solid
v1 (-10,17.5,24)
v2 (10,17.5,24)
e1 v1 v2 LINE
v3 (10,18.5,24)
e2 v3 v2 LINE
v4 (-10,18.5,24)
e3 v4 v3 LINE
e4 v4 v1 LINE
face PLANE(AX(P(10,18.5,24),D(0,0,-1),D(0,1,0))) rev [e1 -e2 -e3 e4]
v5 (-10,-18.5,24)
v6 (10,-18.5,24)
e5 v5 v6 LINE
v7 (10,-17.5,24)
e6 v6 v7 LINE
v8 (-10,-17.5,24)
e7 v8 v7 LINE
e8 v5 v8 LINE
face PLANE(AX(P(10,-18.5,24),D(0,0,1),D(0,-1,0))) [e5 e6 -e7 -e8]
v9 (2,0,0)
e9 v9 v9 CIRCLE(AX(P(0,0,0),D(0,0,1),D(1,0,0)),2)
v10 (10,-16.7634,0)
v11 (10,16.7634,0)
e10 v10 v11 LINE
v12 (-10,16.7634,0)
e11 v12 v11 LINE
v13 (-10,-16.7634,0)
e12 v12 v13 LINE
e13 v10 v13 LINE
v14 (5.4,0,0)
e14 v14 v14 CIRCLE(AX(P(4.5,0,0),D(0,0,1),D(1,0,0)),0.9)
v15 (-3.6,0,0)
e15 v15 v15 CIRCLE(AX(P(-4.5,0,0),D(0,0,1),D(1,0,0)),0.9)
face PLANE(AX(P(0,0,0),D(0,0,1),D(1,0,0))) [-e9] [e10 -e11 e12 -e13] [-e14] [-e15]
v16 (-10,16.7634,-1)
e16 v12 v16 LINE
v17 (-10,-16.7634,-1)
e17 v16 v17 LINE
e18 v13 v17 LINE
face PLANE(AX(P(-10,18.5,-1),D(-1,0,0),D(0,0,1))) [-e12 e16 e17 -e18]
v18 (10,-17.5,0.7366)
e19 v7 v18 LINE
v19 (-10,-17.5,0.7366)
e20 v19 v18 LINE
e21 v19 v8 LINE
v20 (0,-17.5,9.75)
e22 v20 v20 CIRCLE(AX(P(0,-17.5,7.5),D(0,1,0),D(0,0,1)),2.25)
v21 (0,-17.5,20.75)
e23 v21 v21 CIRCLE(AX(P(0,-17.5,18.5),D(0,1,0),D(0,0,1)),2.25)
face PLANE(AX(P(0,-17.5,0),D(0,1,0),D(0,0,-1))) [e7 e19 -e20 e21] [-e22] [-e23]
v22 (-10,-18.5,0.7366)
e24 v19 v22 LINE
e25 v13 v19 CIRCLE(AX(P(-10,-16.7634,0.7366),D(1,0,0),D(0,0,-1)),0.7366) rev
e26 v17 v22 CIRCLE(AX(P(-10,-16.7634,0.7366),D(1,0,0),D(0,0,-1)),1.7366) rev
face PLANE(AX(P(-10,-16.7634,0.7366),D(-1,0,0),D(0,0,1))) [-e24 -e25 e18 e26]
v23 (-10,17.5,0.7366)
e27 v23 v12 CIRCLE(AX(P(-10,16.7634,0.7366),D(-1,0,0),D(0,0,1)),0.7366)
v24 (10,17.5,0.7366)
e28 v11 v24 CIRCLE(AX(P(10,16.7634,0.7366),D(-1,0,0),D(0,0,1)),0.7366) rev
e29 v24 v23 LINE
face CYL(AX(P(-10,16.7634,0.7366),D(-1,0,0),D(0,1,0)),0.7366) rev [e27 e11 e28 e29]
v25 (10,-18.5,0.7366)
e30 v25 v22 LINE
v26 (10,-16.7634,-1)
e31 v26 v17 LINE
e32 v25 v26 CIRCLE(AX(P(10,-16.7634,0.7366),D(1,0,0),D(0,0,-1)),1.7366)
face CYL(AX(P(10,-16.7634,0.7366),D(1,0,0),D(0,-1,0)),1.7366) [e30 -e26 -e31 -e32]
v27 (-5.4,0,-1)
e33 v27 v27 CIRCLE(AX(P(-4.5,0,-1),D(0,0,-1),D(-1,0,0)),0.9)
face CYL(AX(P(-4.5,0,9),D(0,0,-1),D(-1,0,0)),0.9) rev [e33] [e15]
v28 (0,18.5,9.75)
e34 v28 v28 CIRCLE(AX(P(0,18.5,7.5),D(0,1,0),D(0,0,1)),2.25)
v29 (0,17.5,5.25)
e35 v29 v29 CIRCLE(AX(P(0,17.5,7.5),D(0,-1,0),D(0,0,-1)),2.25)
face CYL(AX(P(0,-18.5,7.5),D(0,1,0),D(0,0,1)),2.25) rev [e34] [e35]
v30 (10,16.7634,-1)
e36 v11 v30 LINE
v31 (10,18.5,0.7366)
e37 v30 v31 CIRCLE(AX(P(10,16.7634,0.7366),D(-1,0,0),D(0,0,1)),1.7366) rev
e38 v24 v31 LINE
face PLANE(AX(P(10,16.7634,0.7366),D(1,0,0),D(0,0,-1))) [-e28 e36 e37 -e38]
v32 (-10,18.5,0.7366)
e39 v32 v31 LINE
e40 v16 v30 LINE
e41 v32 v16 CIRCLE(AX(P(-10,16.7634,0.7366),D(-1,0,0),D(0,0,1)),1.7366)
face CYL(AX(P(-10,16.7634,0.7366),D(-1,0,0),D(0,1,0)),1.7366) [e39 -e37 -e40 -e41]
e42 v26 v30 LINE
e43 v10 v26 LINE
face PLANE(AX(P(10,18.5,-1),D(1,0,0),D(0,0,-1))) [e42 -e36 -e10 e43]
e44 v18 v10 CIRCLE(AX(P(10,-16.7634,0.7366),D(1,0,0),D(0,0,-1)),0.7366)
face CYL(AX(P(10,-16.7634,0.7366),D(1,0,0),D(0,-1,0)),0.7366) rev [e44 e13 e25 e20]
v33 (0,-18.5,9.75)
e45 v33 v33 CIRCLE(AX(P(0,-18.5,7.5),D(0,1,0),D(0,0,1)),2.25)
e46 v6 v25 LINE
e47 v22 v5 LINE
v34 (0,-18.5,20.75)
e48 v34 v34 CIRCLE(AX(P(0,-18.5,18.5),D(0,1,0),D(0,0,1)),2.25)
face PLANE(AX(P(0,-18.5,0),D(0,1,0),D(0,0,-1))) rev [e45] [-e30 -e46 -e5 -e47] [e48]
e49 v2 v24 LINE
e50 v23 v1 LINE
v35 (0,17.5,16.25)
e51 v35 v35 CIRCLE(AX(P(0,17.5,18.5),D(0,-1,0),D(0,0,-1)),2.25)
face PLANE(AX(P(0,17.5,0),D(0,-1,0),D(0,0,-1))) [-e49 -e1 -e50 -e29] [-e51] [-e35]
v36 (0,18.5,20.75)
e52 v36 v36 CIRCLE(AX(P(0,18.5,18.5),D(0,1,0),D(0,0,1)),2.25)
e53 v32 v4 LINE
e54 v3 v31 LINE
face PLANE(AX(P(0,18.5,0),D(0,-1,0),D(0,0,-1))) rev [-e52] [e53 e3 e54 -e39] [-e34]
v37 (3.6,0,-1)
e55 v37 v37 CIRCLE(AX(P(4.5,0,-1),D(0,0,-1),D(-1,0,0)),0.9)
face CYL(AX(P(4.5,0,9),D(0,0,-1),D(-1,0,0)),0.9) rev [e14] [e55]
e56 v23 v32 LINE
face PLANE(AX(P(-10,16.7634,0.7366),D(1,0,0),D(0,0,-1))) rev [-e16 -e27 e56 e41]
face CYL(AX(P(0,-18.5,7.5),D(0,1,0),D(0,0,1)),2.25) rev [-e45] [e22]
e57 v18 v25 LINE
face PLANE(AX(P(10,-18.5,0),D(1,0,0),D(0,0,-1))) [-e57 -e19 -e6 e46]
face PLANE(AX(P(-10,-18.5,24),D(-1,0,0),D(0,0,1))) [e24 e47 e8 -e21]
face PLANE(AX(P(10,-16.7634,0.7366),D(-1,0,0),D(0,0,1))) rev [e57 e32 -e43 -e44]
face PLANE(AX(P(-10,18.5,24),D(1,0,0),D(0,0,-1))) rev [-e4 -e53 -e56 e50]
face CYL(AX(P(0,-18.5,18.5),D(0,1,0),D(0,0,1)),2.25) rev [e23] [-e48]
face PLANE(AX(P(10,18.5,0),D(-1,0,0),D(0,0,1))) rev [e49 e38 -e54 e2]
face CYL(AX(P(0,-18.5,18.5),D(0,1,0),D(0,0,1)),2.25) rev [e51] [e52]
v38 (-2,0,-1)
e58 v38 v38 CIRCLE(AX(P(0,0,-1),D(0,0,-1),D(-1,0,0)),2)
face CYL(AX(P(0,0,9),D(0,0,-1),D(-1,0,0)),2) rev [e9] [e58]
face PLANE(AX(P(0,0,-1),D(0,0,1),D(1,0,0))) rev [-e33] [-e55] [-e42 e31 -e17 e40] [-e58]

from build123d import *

# Parameters (mm, degrees)
SKETCH1_W                    = 20
SKETCH1_H                    = 37
BASE_FLANGE1_DEPTH           = 1
EDGE_FLANGE1_STRIP_W         = 5.4732
EDGE_FLANGE1_STRIP_H         = 1
EDGE_FLANGE1_STRIP_CUT_DEPTH = 20
EDGE_FLANGE1_DEPTH           = 20
SKETCH9_R                    = 2
SKETCH9_R_2                  = 0.9
CUT_EXTRUDE1_DEPTH           = 10
SKETCH10_R                   = 2.25
CUT_EXTRUDE2_DEPTH           = 46.221676218


# Sheet-metal steps are written as plain solids
with BuildPart() as part:
    # Sketch1 → Base-Flange1 (new body)
    with BuildSketch(Plane.XY):
        Rectangle(SKETCH1_W, SKETCH1_H)
    extrude(amount=-BASE_FLANGE1_DEPTH)

    # Edge-Flange1 strip (across the edge) → Edge-Flange1 strip cut (cut)
    with BuildSketch(Plane(origin=(10, 18.5, 0), x_dir=(0, -1, 0), z_dir=(-1, 0, 0))):
        with Locations((-1, -0.5)):
            Rectangle(EDGE_FLANGE1_STRIP_W, EDGE_FLANGE1_STRIP_H)
    edge_flange1_strip_cut = extrude(amount=EDGE_FLANGE1_STRIP_CUT_DEPTH, mode=Mode.SUBTRACT)

    # Edge-Flange1 section (across the edge) → Edge-Flange1 (add)
    with BuildSketch(Plane(origin=(10, 18.5, 0), x_dir=(0, -1, 0), z_dir=(-1, 0, 0))):
        with BuildLine():
            Line((0, 0.7366), (0, 24))
            Line((0, 24), (1, 24))
            Line((1, 24), (1, 0.7366))
            ThreePointArc((1, 0.7366), (1.215745145, 0.215745145), (1.7366, 0))
            Line((1.7366, 0), (1.7366, -1))
            ThreePointArc((1.7366, -1), (0.508638364, -0.491361636), (0, 0.7366))
        make_face()
    edge_flange1 = extrude(amount=EDGE_FLANGE1_DEPTH)

    # Mirror1: Edge-Flange1 strip cut, Edge-Flange1 across plane
    add(edge_flange1_strip_cut.mirror(Plane.ZX), mode=Mode.SUBTRACT)
    add(edge_flange1.mirror(Plane.ZX))

    # Sketch9 → Cut-Extrude1 (cut)
    with BuildSketch(Plane(origin=(0, 0, -1), x_dir=(-1, 0, 0), z_dir=(0, 0, -1))):
        Circle(SKETCH9_R)
        with Locations((-4.5, 0)):
            Circle(SKETCH9_R_2)
        with Locations((4.5, 0)):
            Circle(SKETCH9_R_2)
    extrude(amount=-CUT_EXTRUDE1_DEPTH, mode=Mode.SUBTRACT)

    # Sketch10 → Cut-Extrude2 (cut, through all)
    with BuildSketch(Plane(origin=(0, 18.5, 0), x_dir=(1, 0, 0), z_dir=(0, 1, 0))):
        with Locations(Location((0, -7.5, 0), (0, 0, 270))):
            Circle(SKETCH10_R)
        with Locations(Location((0, -18.5, 0), (0, 0, 270))):
            Circle(SKETCH10_R)
    extrude(amount=-CUT_EXTRUDE2_DEPTH, mode=Mode.SUBTRACT)


solid = part.part
